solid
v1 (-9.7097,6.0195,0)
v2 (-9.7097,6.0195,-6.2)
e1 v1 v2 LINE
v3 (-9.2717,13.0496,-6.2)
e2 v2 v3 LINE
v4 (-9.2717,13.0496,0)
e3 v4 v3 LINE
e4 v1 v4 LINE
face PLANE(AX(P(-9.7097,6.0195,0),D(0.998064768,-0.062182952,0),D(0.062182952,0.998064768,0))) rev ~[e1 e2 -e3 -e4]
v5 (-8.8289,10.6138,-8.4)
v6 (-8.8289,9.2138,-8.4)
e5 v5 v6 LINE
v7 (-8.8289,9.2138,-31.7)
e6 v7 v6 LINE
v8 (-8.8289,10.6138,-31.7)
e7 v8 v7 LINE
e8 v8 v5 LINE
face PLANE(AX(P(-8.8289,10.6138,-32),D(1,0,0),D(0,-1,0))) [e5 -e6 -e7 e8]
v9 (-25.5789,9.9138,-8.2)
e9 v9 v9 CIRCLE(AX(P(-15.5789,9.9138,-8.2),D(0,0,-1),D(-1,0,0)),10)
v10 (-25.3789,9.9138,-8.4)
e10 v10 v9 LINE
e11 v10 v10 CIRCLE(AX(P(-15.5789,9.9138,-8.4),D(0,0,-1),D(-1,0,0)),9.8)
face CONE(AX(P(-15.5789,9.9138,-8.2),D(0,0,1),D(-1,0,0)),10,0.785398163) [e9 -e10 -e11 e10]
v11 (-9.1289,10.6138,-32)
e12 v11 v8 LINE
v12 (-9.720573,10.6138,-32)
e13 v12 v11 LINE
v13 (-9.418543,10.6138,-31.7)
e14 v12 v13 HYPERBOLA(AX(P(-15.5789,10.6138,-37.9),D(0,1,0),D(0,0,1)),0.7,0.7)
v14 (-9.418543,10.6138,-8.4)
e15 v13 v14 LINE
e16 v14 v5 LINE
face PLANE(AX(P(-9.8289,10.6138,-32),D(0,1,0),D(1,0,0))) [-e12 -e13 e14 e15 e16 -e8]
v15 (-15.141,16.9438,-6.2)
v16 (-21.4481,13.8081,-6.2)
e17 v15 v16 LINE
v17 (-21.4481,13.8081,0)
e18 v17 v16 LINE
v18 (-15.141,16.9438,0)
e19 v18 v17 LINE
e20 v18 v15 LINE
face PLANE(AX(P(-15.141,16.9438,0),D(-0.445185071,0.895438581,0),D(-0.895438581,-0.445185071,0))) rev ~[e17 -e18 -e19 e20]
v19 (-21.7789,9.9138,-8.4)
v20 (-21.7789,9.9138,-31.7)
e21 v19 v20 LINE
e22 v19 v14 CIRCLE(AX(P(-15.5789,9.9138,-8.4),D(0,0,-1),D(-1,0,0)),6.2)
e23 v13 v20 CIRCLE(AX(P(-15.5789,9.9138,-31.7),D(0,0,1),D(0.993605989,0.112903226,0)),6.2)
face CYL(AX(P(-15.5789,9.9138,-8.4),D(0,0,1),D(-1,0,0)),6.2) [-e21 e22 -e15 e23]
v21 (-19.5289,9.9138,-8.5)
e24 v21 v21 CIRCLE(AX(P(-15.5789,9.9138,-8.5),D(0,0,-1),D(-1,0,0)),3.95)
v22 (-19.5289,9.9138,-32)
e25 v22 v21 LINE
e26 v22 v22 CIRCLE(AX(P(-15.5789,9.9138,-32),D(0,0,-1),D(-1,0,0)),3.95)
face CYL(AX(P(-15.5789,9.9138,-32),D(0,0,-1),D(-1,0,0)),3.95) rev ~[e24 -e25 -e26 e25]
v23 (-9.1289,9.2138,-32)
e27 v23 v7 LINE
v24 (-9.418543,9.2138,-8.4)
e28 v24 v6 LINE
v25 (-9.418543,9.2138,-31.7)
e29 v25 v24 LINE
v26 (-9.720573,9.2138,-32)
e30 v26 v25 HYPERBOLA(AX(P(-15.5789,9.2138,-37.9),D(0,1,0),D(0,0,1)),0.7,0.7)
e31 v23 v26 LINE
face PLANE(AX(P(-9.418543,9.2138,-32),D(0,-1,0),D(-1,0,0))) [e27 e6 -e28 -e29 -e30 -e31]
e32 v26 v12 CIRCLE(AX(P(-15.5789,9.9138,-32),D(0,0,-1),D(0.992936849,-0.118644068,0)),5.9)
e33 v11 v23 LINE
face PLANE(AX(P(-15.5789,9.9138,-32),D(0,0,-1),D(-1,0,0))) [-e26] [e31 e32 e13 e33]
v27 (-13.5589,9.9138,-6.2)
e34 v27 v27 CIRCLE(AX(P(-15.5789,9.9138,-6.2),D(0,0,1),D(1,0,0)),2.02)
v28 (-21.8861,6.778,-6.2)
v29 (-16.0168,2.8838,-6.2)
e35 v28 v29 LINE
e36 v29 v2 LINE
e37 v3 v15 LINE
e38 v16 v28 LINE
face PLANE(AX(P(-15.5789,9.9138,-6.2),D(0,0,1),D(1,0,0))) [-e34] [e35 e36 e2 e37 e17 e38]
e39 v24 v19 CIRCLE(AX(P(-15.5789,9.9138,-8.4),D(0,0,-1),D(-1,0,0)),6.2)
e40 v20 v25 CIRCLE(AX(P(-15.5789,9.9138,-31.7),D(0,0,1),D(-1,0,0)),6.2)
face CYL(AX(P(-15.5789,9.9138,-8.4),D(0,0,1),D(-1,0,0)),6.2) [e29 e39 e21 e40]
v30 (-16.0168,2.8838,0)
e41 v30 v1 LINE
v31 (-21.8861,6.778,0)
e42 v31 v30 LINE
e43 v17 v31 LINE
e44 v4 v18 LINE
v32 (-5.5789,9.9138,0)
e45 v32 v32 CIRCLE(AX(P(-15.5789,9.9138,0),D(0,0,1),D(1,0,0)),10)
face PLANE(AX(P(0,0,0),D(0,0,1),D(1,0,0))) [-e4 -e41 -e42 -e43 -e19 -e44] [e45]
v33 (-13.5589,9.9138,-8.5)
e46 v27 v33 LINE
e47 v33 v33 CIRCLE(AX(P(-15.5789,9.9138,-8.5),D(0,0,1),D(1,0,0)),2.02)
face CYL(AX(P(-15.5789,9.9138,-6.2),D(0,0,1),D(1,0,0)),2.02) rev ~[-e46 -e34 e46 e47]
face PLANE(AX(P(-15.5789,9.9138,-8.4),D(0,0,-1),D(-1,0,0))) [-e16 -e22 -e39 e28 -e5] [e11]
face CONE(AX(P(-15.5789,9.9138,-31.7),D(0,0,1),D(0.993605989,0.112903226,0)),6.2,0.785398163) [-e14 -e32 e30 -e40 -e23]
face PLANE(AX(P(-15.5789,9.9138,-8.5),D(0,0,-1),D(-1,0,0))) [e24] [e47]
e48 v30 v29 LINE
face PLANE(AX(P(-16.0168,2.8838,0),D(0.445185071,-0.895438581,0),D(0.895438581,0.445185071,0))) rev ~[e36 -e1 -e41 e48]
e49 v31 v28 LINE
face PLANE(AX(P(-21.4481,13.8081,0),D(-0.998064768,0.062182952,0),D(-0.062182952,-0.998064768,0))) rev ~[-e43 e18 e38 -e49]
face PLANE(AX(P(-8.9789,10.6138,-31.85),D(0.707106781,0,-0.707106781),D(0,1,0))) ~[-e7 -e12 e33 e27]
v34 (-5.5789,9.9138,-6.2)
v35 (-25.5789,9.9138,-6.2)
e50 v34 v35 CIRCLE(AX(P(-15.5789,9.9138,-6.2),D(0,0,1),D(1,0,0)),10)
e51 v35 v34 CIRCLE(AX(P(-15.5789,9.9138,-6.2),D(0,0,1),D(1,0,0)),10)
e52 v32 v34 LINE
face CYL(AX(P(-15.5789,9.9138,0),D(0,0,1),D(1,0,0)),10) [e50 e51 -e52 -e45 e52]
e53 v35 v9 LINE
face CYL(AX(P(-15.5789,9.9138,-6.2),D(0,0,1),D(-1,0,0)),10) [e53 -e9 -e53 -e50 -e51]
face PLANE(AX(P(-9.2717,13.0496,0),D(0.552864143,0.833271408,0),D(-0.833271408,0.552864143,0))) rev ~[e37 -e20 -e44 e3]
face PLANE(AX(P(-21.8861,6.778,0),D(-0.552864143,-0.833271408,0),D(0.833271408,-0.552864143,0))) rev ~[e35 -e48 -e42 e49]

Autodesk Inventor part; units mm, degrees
ref_plane "YZ Plane" through (0, 0, 0) normal (1, 0, 0) x (0, 1, 0)
ref_plane "XZ Plane" through (0, 0, 0) normal (0, 1, 0) x (-1, 0, 0)
ref_plane "Work Plane1" through (0, 0, 0) normal (0, 0, 1) x (1, 0, 0)
sketch "Sketch1" plane through (0, 0, 0) normal (0, 0, 1) x (1, 0, 0)
  line L0 (-9.8058, 6.0834) -> (-16.0096, 2.999) projected
  line L1 (-16.0096, 2.999) -> (-21.7826, 6.8295) projected
  line L2 (-21.7826, 6.8295) -> (-21.3519, 13.7443) projected
  line L3 (-21.3519, 13.7443) -> (-15.1481, 16.8286) projected
  line L4 (-15.1481, 16.8286) -> (-9.3751, 12.9982) projected
  line L5 (-9.3751, 12.9982) -> (-9.8058, 6.0834) projected
  line L6 (-15.1481, 16.8286) -> (-16.0096, 2.999)
  circle A0 centre (-15.5789, 9.9138) radius 10
  point P0 (0, 0)
  dimension "d0" = 12
  dimension "d1" = 20
extrude "Extrusion1" add sketch "Sketch1" against normal blind 6.2
sketch "Sketch2" plane through (-15.5789, 9.9138, -6.2) normal (0, 0, -1) x (-1, 0, 0)
  circle A0 centre (0, 0) radius 10 projected
  point P0 (-15.5789, -9.9138)
extrude "Extrusion2" add sketch "Sketch2" along normal blind 2.2
sketch "Sketch3" plane through (-15.5789, 9.9138, -8.4) normal (0, 0, -1) x (-1, 0, 0)
  circle A0 centre (0, 0) radius 10 projected
  circle A1 centre (0, 0) radius 3.3
  point P0 (-15.5789, -9.9138)
  dimension "d6" = 6.6
extrude "Extrusion3" cut sketch "Sketch3" against normal through all contours A1
sketch "Sketch4" plane through (-15.5789, 9.9138, -8.4) normal (0, 0, -1) x (-1, 0, 0)
  circle A0 centre (0, 0) radius 3.3 projected
  circle A1 centre (0, 0) radius 6.1
  point P0 (-15.5789, -9.9138)
  dimension "d9" = 12.2
extrude "Extrusion4" add sketch "Sketch4" along normal blind 23.5
chamfer "Chamfer3" distance 0.2 angle 45 1 edges at (-5.5789, 9.9138, -8.4)
sketch "Sketch6" plane through (-15.5789, 9.9138, -6.2) normal (0, 0, 1) x (1, 0, 0)
  circle A0 centre (0, 0) radius 3.3 projected
  point P0 (15.5789, -9.9138)
extrude "Extrusion6" add sketch "Sketch6" against normal blind 2.3
sketch "Sketch7" plane through (-15.5789, 9.9138, -8.5) normal (0, 0, -1) x (-1, 0, 0)
  circle A0 centre (0, 0) radius 3.3 projected
  circle A1 centre (0, 0) radius 1.92
  point P0 (-15.5789, -9.9138)
  dimension "d42" = 3.84
extrude "Extrusion7" cut sketch "Sketch7" against normal through all contours A1
sketch "Sketch9" plane through (-15.5789, 9.9138, -6.2) normal (0, 0, 1) x (1, 0, 0)
  circle A0 centre (0, 0) radius 1.92 projected
  circle A1 centre (0, 0) radius 2.02
  point P0 (15.5789, -9.9138)
  dimension "d52" = 0.1
extrude "Extrusion8" cut sketch "Sketch9" against normal blind 10 contours A0 | A1
sketch "Sketch10" plane through (-15.5789, 9.9138, 0) normal (0, 0, 1) x (1, 0, 0)
  circle A0 centre (0, 0) radius 10 projected
  line L0 (0.4308, 6.9148) -> (6.2038, 3.0844) projected
  line L1 (6.2038, 3.0844) -> (5.773, -3.8304) projected
  line L2 (5.773, -3.8304) -> (-0.4308, -6.9148) projected
  line L3 (-0.4308, -6.9148) -> (-6.2038, -3.0844) projected
  line L4 (-6.2038, -3.0844) -> (-5.773, 3.8304) projected
  line L5 (-5.773, 3.8304) -> (0.4308, 6.9148) projected
  line L6 (5.8692, -3.8943) -> (6.3072, 3.1358)
  line L7 (6.3072, 3.1358) -> (0.4379, 7.03)
  line L8 (0.4379, 7.03) -> (-5.8692, 3.8943)
  line L9 (-5.8692, 3.8943) -> (-6.3072, -3.1358)
  line L10 (-6.3072, -3.1358) -> (-0.4379, -7.03)
  line L11 (-0.4379, -7.03) -> (5.8692, -3.8943)
  point P0 (15.5789, -9.9138)
  dimension "d55" = 0.1
extrude "Extrusion9" cut sketch "Sketch10" against normal up to surface (6.2 mm away) contours L11 L10 L9 L8 L7 L6
thicken "Thicken3" operation add thickness 0.1 both sides no extend neighbours no toward (0, 0, -1) faces at (-20.6545, 9.164, -31.9) (-21.6591, 9.423, -24.0667)
sketch "Sketch11" plane through (-15.5789, 9.9138, -32) normal (0, 0, -1) x (-1, 0, 0)
  circle A0 centre (0, 0) radius 6.2 projected
  circle A1 centre (0, 0) radius 6.2 projected
  line L0 (-6.2, 0) -> (-6.2, 0.7)
  line L1 (-6.2, 0) -> (-5.5, 0) construction
  line L2 (-6.2, 0) -> (-6.2, -0.7)
  line L3 (-6.2, 0) -> (-5.5, 0) construction
  line L4 (-6.2, 0) -> (-6.7, 0)
  line L5 (-6.75, -0.7) -> (-5.75, -0.7)
  line L6 (-5.75, -0.7) -> (-5.75, 0.7)
  line L7 (-5.75, 0.7) -> (-6.75, 0.7)
  line L8 (-6.75, 0.7) -> (-6.75, -0.7)
  point P0 (-15.5789, -9.9138)
  dimension "d60" = 0.7
  dimension "d61" = 90
  dimension "d62" = 0.7
  dimension "d63" = 90
  dimension "d64" = 0.5
  dimension "d79" = 1
  dimension "d80" = 5.75
extrude "Extrusion10" add sketch "Sketch11" against normal up to surface (23.6 mm away) contours L7 L6 L5 A0 | A0 L0 L7 | L5 L2 A0 | L2 L5 L8 L7 L0 picked at (-5.9, 0)
chamfer "Chamfer9" distance 0.3 angle 45 2 edges at (-15.9294, 3.7237, -32) (-15.9294, 16.1039, -32)
chamfer "Chamfer10" distance 0.3 angle 45 1 edges at (-8.8289, 9.9138, -32)
sketch "Sketch14" plane through (-15.5789, 9.9138, -32) normal (0, 0, -1) x (-1, 0, 0)
  line L0 (-6.45, -0.7) -> (-6.45, 0.7) projected
  line L1 (-6.45, -0.7) -> (-5.8583, -0.7) projected
  arc A0 (-5.8583, -0.7) -> (-5.8583, 0.7) centre (0, 0) ccw projected
  line L2 (-5.8583, 0.7) -> (-6.45, 0.7) projected
  circle A1 centre (0, 0) radius 3.3 projected
  circle A2 centre (0, 0) radius 3.95
  point P0 (-15.5789, -9.9138)
  dimension "d75" = 6.6
  dimension "d76" = 7.9
extrude "Extrusion12" cut sketch "Sketch14" against normal up to surface (23.5 mm away) contours A1 | A2
properties part number "omni_ext_3DPrint"
